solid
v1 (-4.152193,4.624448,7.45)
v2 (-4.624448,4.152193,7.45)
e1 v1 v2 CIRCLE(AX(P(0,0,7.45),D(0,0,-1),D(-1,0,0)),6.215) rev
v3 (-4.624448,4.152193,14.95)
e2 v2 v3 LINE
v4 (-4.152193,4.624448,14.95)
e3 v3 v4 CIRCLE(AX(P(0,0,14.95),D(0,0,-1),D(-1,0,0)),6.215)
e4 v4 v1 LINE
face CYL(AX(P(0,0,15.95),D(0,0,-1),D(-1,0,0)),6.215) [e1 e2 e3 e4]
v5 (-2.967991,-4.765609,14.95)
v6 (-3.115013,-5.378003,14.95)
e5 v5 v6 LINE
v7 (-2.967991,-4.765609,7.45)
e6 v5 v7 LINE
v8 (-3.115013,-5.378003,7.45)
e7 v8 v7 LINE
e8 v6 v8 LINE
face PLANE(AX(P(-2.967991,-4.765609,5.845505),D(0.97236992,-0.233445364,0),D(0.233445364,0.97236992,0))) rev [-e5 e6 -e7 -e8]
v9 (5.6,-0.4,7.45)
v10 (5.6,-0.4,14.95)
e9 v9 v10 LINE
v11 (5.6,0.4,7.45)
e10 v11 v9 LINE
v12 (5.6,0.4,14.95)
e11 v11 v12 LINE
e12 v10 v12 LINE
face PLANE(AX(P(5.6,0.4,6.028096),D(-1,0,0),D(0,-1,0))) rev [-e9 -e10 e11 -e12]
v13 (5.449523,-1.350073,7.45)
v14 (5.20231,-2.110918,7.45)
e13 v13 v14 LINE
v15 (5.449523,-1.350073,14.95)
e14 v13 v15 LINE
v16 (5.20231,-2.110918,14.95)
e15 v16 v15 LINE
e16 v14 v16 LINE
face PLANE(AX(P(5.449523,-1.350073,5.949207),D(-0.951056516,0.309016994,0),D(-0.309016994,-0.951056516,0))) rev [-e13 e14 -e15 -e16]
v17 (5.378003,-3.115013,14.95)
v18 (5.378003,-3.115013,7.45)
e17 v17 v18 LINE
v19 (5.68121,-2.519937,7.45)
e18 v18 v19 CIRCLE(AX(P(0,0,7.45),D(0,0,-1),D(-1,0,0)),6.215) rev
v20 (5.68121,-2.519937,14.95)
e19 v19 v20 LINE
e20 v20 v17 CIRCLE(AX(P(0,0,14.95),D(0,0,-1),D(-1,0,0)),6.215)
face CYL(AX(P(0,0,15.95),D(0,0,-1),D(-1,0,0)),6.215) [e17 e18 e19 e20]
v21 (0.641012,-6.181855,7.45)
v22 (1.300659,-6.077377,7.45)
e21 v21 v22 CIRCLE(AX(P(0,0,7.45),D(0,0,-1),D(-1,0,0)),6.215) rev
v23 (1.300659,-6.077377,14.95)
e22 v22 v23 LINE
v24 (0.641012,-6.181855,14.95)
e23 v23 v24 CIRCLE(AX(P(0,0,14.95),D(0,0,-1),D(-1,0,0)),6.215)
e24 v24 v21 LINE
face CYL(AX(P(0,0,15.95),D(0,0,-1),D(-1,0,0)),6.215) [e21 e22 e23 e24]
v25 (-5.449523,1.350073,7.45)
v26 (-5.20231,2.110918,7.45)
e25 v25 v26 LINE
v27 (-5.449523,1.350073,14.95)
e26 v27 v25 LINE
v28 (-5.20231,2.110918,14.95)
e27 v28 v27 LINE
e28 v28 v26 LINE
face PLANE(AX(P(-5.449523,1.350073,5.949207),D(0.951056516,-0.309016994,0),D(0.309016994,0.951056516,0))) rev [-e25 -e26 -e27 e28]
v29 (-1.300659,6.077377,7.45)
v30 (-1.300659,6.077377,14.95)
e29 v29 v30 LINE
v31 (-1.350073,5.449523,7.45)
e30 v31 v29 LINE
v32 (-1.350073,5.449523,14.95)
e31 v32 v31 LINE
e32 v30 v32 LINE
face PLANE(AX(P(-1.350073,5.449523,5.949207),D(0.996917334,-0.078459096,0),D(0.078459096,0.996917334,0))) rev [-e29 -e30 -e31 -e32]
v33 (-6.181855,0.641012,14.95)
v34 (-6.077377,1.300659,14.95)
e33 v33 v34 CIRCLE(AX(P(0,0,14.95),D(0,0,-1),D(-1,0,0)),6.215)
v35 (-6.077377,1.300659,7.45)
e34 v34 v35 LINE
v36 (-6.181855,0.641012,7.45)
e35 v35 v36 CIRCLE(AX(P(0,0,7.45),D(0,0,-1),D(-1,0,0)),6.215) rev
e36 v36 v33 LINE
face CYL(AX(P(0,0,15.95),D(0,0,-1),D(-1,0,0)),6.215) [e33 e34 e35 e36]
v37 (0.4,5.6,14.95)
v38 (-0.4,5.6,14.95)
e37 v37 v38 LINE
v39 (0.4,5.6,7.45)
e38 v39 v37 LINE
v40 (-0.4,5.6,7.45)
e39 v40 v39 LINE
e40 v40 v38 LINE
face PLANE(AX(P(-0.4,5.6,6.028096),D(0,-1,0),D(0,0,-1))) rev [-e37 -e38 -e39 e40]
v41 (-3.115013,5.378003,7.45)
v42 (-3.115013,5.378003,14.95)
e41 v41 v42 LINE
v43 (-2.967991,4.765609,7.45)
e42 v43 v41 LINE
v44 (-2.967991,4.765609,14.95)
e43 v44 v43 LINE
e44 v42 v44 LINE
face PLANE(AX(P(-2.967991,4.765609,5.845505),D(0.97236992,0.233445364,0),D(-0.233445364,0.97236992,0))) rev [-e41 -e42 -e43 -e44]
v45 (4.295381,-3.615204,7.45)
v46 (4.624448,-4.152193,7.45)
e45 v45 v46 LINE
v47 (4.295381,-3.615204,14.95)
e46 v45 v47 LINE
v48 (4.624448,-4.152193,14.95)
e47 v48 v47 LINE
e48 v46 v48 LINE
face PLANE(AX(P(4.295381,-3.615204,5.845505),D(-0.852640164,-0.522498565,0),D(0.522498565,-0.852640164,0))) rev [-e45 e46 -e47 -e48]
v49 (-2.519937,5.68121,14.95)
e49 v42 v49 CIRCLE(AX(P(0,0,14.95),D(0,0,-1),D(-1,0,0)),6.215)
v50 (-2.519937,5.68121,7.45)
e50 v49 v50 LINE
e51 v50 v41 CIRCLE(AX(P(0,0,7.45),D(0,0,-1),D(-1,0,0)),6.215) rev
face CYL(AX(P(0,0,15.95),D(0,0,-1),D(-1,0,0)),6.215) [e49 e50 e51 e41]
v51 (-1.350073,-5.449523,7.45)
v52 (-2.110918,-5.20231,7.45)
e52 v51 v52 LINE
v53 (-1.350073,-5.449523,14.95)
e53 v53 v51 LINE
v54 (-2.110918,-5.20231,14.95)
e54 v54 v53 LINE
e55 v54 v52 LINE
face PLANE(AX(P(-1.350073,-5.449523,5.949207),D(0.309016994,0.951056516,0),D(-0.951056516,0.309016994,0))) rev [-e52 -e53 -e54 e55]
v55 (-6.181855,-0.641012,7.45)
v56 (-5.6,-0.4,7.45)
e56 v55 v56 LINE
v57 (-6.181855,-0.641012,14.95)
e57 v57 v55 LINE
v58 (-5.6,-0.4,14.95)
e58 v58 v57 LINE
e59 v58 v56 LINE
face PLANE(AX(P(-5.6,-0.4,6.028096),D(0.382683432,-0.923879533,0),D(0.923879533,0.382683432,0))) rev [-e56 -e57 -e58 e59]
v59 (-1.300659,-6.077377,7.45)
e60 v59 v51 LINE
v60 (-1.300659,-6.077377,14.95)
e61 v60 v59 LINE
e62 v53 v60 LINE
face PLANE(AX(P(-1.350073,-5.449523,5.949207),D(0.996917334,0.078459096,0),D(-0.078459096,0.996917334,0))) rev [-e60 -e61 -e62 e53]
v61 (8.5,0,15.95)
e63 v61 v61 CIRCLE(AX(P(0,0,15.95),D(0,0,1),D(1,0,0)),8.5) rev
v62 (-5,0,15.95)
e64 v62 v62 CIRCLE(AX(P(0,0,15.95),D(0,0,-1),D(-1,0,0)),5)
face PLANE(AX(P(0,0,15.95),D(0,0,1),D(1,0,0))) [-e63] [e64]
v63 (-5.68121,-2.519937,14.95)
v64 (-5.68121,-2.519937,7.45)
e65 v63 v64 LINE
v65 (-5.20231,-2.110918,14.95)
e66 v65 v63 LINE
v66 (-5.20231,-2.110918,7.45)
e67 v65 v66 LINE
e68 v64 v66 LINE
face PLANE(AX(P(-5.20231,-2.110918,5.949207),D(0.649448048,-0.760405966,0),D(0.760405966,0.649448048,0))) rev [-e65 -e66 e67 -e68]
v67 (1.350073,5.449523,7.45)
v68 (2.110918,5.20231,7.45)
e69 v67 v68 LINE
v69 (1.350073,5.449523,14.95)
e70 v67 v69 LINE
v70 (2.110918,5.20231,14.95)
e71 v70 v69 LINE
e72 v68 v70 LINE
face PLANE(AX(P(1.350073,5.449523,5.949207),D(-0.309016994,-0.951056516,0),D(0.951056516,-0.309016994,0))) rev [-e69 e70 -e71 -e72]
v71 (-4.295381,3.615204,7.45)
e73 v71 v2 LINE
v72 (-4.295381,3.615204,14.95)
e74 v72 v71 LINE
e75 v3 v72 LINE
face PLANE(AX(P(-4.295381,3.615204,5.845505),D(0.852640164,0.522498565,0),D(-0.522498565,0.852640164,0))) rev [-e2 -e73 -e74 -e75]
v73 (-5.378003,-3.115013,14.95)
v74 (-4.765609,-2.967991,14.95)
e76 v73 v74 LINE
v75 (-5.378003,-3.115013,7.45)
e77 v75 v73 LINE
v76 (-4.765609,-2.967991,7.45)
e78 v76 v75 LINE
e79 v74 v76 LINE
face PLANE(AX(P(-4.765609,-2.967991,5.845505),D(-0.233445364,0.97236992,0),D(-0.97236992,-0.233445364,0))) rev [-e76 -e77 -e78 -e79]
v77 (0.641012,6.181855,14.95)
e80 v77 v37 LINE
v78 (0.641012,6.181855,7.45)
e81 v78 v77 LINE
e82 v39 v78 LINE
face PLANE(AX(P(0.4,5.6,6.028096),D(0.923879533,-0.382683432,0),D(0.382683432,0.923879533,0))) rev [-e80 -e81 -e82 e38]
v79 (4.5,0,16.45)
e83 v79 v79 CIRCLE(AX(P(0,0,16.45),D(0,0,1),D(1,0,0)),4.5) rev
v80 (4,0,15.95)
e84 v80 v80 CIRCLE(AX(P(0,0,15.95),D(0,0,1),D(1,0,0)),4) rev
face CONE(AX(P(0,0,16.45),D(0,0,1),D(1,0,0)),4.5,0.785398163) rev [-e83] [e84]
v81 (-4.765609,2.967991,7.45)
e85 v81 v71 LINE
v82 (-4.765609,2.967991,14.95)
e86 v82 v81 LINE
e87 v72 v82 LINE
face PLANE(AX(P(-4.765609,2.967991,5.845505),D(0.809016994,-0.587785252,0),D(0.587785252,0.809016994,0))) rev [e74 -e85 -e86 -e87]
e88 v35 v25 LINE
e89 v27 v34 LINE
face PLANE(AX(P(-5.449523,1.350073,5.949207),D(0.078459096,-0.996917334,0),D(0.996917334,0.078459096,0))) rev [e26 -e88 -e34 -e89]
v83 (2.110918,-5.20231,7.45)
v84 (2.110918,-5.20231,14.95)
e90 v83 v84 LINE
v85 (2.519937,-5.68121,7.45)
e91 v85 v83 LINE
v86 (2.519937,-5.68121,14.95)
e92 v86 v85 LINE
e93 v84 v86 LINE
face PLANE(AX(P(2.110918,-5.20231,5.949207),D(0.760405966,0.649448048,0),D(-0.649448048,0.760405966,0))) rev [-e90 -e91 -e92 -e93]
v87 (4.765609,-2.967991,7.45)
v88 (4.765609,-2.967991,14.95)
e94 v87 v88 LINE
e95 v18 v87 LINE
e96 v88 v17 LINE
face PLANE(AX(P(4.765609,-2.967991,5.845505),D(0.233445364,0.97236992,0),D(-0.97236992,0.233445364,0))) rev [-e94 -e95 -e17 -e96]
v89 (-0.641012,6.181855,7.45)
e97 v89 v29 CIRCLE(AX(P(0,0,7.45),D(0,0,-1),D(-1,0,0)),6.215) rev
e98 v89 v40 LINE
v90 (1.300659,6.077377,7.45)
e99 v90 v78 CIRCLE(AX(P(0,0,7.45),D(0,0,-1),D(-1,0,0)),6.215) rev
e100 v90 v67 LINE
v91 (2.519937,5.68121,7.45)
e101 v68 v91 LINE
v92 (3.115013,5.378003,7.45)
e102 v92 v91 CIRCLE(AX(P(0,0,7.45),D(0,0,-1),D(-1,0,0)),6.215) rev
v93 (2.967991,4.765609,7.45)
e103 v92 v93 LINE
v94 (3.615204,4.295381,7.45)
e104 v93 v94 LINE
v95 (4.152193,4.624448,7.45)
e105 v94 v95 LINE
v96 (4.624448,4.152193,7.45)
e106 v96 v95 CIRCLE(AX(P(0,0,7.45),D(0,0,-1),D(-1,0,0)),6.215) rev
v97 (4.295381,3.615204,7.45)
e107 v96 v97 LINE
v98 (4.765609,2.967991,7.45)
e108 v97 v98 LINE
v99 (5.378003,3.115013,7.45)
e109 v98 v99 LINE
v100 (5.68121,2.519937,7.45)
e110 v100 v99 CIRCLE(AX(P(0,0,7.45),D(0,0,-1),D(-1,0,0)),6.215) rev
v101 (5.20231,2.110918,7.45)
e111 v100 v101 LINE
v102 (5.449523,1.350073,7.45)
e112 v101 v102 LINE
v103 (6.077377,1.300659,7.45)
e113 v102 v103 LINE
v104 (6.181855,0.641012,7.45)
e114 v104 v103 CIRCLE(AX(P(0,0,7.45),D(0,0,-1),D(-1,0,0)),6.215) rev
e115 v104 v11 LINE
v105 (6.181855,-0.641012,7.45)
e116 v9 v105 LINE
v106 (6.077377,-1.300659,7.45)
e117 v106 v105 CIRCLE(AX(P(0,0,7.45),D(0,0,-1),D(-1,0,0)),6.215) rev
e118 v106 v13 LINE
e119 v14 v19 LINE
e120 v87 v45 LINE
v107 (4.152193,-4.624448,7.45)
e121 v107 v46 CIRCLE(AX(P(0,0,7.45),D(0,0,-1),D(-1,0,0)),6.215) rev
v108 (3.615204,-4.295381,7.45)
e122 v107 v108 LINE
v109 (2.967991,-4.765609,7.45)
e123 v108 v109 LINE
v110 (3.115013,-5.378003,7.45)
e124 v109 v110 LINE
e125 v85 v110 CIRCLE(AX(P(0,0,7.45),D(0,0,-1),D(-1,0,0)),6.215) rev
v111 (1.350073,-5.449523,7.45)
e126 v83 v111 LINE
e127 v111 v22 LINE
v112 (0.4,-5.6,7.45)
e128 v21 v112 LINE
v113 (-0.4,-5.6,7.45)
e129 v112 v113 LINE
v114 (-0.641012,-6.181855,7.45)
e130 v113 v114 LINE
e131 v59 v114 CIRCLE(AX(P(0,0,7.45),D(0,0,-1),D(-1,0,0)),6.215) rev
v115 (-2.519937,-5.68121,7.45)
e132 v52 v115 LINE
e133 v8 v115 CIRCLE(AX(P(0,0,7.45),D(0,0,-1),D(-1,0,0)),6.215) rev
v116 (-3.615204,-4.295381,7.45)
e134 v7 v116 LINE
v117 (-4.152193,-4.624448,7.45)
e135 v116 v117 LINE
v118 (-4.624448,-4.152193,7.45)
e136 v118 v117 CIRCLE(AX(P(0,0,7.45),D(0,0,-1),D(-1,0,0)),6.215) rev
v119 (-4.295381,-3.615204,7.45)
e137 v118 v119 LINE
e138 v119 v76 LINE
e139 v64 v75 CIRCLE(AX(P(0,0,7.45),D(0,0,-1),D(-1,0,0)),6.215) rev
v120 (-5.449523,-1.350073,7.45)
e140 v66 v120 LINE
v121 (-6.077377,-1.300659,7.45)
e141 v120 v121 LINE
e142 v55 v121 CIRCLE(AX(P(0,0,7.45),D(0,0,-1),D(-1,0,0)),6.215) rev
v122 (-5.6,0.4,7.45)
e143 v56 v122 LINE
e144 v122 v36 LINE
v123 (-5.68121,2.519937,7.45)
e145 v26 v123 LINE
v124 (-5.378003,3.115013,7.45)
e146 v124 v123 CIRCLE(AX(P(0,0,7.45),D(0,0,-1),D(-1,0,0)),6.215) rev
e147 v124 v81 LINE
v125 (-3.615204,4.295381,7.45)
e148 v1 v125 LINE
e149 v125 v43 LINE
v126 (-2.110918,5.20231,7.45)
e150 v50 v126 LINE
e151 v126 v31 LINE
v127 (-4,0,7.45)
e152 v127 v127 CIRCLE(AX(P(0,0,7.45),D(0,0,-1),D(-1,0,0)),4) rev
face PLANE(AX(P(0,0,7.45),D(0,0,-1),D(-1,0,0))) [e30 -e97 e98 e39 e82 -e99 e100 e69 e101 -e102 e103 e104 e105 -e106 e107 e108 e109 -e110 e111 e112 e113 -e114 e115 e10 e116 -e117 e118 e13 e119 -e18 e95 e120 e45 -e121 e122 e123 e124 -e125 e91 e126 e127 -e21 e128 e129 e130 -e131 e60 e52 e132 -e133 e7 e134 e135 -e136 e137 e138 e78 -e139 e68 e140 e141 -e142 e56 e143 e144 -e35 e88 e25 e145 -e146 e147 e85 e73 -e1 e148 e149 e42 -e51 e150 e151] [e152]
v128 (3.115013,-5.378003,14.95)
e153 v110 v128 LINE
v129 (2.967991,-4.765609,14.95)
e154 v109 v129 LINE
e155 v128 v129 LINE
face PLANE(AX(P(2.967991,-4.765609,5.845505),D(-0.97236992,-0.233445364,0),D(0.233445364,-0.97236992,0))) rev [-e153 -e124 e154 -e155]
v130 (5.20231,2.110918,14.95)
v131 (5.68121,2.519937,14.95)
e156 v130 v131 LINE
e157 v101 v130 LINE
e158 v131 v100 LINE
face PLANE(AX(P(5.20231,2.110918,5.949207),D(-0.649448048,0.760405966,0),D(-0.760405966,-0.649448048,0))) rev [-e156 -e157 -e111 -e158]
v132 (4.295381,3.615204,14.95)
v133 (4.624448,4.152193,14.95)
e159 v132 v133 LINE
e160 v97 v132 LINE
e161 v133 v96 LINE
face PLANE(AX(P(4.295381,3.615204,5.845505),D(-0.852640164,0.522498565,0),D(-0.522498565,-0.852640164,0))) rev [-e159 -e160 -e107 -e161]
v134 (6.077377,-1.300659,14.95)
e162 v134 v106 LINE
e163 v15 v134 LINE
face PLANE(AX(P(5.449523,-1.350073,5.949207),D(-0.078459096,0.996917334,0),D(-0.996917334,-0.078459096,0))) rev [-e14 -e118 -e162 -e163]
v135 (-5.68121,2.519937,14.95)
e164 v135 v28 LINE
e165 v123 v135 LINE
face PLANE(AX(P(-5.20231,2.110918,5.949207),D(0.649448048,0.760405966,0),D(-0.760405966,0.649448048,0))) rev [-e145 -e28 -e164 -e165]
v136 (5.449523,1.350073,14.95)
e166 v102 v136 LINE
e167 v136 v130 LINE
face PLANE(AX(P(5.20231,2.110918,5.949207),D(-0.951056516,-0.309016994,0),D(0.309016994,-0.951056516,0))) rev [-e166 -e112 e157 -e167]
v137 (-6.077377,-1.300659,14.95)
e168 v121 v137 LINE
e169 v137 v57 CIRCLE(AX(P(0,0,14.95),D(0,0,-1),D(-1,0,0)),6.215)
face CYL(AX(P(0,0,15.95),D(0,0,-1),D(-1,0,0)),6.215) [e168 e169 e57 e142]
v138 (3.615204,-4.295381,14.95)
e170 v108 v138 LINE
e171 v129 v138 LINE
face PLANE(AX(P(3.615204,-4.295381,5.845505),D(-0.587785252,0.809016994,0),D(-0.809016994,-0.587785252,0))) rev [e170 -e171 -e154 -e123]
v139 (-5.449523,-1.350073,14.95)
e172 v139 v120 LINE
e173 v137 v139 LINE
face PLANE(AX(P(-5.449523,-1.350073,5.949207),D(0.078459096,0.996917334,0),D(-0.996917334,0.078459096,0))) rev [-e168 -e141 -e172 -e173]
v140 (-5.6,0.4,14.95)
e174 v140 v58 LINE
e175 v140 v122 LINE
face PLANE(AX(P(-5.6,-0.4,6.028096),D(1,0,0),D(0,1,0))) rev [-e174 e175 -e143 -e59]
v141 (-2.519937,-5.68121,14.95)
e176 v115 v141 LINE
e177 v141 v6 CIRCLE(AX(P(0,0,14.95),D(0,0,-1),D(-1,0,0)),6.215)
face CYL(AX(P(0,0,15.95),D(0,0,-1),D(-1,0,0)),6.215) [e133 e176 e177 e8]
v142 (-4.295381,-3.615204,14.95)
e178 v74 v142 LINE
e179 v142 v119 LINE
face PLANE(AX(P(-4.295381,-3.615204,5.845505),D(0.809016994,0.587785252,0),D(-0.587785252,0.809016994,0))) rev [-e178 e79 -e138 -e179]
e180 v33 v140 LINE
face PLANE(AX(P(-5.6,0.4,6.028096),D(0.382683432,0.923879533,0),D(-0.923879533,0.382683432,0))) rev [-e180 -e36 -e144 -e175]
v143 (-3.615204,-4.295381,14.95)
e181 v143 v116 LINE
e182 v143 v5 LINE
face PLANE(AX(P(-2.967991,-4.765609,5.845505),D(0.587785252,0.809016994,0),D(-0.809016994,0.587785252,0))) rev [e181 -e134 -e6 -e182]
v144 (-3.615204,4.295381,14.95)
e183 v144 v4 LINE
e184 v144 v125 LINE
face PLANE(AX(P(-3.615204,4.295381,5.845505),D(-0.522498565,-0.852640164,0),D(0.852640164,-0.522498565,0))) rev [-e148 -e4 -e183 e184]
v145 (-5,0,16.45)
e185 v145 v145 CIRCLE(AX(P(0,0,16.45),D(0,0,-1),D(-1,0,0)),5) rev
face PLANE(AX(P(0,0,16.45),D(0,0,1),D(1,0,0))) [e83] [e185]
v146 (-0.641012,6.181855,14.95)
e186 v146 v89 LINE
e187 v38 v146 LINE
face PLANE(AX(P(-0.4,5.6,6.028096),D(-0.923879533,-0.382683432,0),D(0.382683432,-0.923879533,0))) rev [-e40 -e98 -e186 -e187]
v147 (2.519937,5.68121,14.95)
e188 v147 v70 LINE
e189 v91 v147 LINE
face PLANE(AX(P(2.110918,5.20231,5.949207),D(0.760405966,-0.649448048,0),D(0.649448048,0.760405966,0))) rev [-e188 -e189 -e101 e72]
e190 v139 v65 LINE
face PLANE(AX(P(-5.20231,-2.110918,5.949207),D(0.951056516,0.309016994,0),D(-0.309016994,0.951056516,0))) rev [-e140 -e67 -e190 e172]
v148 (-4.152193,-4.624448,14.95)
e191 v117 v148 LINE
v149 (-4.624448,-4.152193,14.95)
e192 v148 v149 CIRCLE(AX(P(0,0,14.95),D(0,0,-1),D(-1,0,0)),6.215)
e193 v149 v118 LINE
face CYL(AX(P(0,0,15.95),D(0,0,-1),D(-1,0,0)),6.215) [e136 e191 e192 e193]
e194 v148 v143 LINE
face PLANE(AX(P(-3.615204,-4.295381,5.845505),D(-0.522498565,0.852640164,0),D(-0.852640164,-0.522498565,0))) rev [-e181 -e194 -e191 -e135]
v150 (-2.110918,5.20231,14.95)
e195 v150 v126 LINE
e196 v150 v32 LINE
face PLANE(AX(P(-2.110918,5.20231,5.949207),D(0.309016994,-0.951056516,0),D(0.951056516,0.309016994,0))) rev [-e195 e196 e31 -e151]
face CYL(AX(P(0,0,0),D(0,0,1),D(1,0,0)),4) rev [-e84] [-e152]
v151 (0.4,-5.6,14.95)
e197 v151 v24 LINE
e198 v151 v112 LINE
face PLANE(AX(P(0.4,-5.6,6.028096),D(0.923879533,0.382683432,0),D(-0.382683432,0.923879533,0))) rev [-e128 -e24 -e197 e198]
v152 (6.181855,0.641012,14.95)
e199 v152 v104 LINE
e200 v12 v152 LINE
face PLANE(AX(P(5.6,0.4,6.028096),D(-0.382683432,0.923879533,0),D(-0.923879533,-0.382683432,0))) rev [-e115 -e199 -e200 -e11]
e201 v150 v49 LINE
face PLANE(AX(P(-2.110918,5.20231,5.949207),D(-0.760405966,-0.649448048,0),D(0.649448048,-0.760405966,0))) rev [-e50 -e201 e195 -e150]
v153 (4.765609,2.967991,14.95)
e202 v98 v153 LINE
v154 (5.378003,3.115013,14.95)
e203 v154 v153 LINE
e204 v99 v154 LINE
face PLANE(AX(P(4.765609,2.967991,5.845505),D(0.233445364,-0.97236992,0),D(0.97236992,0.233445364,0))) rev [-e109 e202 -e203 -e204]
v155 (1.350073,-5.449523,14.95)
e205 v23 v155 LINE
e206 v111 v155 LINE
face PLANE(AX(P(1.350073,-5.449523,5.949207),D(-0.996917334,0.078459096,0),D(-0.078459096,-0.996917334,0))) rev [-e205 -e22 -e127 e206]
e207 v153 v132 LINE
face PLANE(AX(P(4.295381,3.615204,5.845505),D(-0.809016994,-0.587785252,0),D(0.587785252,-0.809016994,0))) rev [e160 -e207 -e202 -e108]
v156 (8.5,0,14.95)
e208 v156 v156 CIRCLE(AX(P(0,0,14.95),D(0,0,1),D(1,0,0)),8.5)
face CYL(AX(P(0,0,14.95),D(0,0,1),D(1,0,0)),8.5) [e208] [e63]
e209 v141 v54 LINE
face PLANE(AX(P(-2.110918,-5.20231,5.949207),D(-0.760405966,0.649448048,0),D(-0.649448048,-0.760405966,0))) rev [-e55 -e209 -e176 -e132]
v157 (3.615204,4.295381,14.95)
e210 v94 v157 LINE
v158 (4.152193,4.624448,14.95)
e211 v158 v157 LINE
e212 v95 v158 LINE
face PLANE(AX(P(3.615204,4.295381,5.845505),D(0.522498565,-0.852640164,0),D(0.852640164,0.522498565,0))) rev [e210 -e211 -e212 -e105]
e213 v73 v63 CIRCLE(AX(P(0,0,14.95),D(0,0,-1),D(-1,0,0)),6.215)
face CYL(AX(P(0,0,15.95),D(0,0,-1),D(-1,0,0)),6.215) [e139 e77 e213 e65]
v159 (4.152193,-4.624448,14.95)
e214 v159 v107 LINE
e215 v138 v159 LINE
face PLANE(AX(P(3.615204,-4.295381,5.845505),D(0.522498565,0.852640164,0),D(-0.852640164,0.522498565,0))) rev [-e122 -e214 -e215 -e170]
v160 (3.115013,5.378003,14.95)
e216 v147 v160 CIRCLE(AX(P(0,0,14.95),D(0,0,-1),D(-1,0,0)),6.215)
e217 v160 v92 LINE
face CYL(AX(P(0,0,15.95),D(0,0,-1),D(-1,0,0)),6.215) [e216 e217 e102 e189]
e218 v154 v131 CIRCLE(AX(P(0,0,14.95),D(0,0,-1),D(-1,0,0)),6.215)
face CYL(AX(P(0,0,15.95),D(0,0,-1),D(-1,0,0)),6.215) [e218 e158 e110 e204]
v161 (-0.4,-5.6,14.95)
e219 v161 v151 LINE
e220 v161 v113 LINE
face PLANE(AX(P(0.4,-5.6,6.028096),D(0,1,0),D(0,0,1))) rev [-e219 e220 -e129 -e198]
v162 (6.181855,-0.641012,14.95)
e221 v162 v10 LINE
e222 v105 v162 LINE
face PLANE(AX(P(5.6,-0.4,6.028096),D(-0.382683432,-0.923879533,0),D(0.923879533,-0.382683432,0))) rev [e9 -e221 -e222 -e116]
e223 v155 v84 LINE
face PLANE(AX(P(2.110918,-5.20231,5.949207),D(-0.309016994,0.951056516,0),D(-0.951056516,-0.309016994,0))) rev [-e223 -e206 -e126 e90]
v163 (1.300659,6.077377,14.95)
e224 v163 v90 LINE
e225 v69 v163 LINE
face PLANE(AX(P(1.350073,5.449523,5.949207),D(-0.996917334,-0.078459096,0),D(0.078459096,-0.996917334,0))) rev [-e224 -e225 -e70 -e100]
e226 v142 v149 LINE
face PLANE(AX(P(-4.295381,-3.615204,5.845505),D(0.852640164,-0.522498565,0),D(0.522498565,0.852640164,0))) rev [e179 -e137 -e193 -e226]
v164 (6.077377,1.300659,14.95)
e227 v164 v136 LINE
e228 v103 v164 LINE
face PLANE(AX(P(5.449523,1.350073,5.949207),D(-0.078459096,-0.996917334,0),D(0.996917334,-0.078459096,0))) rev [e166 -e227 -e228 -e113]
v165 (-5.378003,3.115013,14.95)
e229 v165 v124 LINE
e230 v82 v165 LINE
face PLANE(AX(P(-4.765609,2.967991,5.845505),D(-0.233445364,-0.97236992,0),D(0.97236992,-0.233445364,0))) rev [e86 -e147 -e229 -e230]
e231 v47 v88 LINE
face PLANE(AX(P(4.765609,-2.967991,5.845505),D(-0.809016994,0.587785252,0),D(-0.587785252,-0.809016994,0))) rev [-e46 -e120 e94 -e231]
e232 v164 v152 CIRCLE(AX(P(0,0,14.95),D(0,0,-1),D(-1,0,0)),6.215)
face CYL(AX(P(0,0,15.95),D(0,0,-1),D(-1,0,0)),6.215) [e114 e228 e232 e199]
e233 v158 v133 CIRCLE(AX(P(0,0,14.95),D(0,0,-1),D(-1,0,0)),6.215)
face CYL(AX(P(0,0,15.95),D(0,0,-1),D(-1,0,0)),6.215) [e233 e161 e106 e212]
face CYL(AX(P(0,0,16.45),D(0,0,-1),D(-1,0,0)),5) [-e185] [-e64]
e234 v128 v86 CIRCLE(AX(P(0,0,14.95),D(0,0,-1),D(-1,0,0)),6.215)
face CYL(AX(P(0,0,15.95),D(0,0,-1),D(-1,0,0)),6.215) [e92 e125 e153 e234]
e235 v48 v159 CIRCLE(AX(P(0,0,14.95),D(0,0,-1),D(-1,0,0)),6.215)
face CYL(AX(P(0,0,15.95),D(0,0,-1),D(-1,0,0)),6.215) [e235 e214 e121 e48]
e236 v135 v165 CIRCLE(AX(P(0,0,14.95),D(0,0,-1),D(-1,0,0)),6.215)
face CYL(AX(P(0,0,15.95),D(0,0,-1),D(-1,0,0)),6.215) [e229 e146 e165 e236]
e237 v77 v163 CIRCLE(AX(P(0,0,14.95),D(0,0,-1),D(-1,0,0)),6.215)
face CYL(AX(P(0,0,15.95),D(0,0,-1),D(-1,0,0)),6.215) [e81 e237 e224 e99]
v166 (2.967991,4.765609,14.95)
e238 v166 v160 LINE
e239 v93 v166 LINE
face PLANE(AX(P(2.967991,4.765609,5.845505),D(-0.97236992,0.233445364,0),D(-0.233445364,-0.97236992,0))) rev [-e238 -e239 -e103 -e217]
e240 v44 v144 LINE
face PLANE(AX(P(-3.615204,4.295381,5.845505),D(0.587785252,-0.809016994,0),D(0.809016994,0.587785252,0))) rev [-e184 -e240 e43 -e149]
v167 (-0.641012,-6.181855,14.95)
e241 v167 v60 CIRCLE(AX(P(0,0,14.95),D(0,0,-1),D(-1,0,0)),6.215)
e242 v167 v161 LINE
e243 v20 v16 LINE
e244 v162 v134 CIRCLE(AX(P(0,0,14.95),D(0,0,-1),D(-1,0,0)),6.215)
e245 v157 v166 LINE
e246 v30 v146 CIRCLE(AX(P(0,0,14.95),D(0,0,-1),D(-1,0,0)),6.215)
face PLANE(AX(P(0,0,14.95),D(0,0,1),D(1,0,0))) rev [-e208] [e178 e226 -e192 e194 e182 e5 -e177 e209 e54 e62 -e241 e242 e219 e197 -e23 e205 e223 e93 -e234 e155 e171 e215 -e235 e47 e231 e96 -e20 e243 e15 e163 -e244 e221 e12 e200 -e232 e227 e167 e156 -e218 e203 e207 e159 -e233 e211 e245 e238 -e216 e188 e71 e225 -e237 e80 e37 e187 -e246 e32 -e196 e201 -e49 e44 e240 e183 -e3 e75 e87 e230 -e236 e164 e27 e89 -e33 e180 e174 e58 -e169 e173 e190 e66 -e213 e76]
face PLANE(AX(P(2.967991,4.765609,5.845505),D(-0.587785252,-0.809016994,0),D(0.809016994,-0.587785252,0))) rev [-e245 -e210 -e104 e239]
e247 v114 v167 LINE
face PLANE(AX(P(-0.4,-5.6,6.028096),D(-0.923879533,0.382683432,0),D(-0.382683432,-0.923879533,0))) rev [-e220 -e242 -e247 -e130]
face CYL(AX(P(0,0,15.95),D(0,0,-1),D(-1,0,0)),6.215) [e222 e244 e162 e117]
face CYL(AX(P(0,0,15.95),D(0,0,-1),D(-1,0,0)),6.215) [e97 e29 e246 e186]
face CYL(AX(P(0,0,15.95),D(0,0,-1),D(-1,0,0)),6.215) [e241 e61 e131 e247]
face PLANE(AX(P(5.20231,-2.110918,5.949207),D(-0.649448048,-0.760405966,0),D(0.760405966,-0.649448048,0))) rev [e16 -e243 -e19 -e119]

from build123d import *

# Parameters (mm, degrees)
CUT_EXTRUDE1_DEPTH       = 3
CHAMFER1_SIZE            = 0.259911356
CHAMFER1_SIZE2           = 0.226339217
CUT_EXTRUDE2_START       = 1
CUT_EXTRUDE2_2_OUTLINE_W = 16
CUT_EXTRUDE2_2_OUTLINE_H = 4
CUT_EXTRUDE2_2_DEPTH     = 6.45
CUT_EXTRUDE2_START_2     = 7.45
CUT_EXTRUDE2_3_OUTLINE_R = 5
CUT_EXTRUDE2_3_DEPTH     = 7.5


with BuildPart() as part:
    # Sketch1 → Revolve1 (revolve)
    with BuildSketch(Plane.XY.offset(3.725), mode=Mode.PRIVATE) as revolve1_sk:
        Polygon((1.614337285, 9), (0, 9), (0, 5), (0.595828025, 5), (1.614337285, 5.592863599), align=None)
    revolve(revolve1_sk.sketch.rotate(Axis((0, 9, 3.725), (0, -1, 0)), 270), axis=Axis((0, 9, 3.725), (0, -1, 0)))

    # Sketch2 → Cut-Extrude1 (cut)
    with BuildSketch(Plane(origin=(0, 9, 0), x_dir=(-1, 0, 0), z_dir=(0, 1, 0))):
        Polygon((0.877701457, 2.974684409), (1.088643091, 4.109953963), (0.210941634, 4.860269554), (-0.877701457, 4.475315591), (-1.088643091, 3.340046037), (-0.210941634, 2.589730446), align=None)
    extrude(amount=-CUT_EXTRUDE1_DEPTH, mode=Mode.SUBTRACT)

    # Chamfer1
    chamfer1_edges = [part.edges().sort_by_distance(p)[0] for p in [
        (0, 9, 5.339337285),
    ]]
    chamfer1_side = [part.faces().sort_by_distance(p)[0] for p in [
        (0, 9, 5.293676931),
    ]]
    chamfer(chamfer1_edges, length=CHAMFER1_SIZE, length2=CHAMFER1_SIZE2, reference=chamfer1_side[0])

    # Cut-Extrude2 2 outline → Cut-Extrude2 2 (cut)
    with BuildSketch(Plane.XY.offset(CUT_EXTRUDE2_START)):
        with Locations((0, 7)):
            Rectangle(CUT_EXTRUDE2_2_OUTLINE_W, CUT_EXTRUDE2_2_OUTLINE_H)
    extrude(amount=CUT_EXTRUDE2_2_DEPTH, mode=Mode.SUBTRACT)


with BuildPart() as body_2:
    # Cut-Extrude2: read off the stored shape, not the designer's step
    # Cut-Extrude2 outline → Cut-Extrude2 (revolve)
    with BuildSketch(Plane.XZ):
        Polygon((4, 7.45), (5, 7.45), (5, 14.95), (8.5, 14.95), (8.5, 15.95), (5, 15.95), (5, 16.45), (4.5, 16.45), (4, 15.95), align=None)
    revolve(axis=Axis((0, 0, 0), (0, 0, 1)))

    # Cut-Extrude2 3 outline → Cut-Extrude2 3 (add)
    with BuildSketch(Plane.XY.offset(CUT_EXTRUDE2_START_2)):
        with BuildLine():
            Line((1.30065941, -6.077376909), (1.350072562, -5.449523289))
            Line((1.350072562, -5.449523289), (2.110917775, -5.202309694))
            Line((2.110917775, -5.202309694), (2.519936953, -5.681209621))
            ThreePointArc((2.519936953, -5.681209621), (2.821550956, -5.537605548), (3.115013354, -5.37800305))
            Line((3.115013354, -5.37800305), (2.967990615, -4.765609269))
            Line((2.967990615, -4.765609269), (3.615204211, -4.295381068))
            Line((3.615204211, -4.295381068), (4.152192781, -4.624448087))
            ThreePointArc((4.152192781, -4.624448087), (4.394668645, -4.394668645), (4.624448087, -4.152192781))
            Line((4.624448087, -4.152192781), (4.295381068, -3.615204211))
            Line((4.295381068, -3.615204211), (4.765609269, -2.967990615))
            Line((4.765609269, -2.967990615), (5.37800305, -3.115013354))
            ThreePointArc((5.37800305, -3.115013354), (5.537605548, -2.821550956), (5.681209621, -2.519936953))
            Line((5.681209621, -2.519936953), (5.202309694, -2.110917775))
            Line((5.202309694, -2.110917775), (5.449523289, -1.350072562))
            Line((5.449523289, -1.350072562), (6.077376909, -1.30065941))
            ThreePointArc((6.077376909, -1.30065941), (6.138483037, -0.9722402), (6.181854773, -0.641012138))
            Line((6.181854773, -0.641012138), (5.6, -0.4))
            Line((5.6, -0.4), (5.6, 0.4))
            Line((5.6, 0.4), (6.181854773, 0.641012138))
            ThreePointArc((6.181854773, 0.641012138), (6.138483037, 0.9722402), (6.077376909, 1.30065941))
            Line((6.077376909, 1.30065941), (5.449523289, 1.350072562))
            Line((5.449523289, 1.350072562), (5.202309694, 2.110917775))
            Line((5.202309694, 2.110917775), (5.681209621, 2.519936953))
            ThreePointArc((5.681209621, 2.519936953), (5.537605548, 2.821550956), (5.37800305, 3.115013354))
            Line((5.37800305, 3.115013354), (4.765609269, 2.967990615))
            Line((4.765609269, 2.967990615), (4.295381068, 3.615204211))
            Line((4.295381068, 3.615204211), (4.624448087, 4.152192781))
            ThreePointArc((4.624448087, 4.152192781), (4.394668645, 4.394668645), (4.152192781, 4.624448087))
            Line((4.152192781, 4.624448087), (3.615204211, 4.295381068))
            Line((3.615204211, 4.295381068), (2.967990615, 4.765609269))
            Line((2.967990615, 4.765609269), (3.115013354, 5.37800305))
            ThreePointArc((3.115013354, 5.37800305), (2.821550956, 5.537605548), (2.519936953, 5.681209621))
            Line((2.519936953, 5.681209621), (2.110917775, 5.202309694))
            Line((2.110917775, 5.202309694), (1.350072562, 5.449523289))
            Line((1.350072562, 5.449523289), (1.30065941, 6.077376909))
            ThreePointArc((1.30065941, 6.077376909), (0.9722402, 6.138483037), (0.641012138, 6.181854773))
            Line((0.641012138, 6.181854773), (0.4, 5.6))
            Line((0.4, 5.6), (-0.4, 5.6))
            Line((-0.4, 5.6), (-0.641012138, 6.181854773))
            ThreePointArc((-0.641012138, 6.181854773), (-0.9722402, 6.138483037), (-1.30065941, 6.077376909))
            Line((-1.30065941, 6.077376909), (-1.350072562, 5.449523289))
            Line((-1.350072562, 5.449523289), (-2.110917775, 5.202309694))
            Line((-2.110917775, 5.202309694), (-2.519936953, 5.681209621))
            ThreePointArc((-2.519936953, 5.681209621), (-2.821550956, 5.537605548), (-3.115013354, 5.37800305))
            Line((-3.115013354, 5.37800305), (-2.967990615, 4.765609269))
            Line((-2.967990615, 4.765609269), (-3.615204211, 4.295381068))
            Line((-3.615204211, 4.295381068), (-4.152192781, 4.624448087))
            ThreePointArc((-4.152192781, 4.624448087), (-4.394668645, 4.394668645), (-4.624448087, 4.152192781))
            Line((-4.624448087, 4.152192781), (-4.295381068, 3.615204211))
            Line((-4.295381068, 3.615204211), (-4.765609269, 2.967990615))
            Line((-4.765609269, 2.967990615), (-5.37800305, 3.115013354))
            ThreePointArc((-5.37800305, 3.115013354), (-5.537605548, 2.821550956), (-5.681209621, 2.519936953))
            Line((-5.681209621, 2.519936953), (-5.202309694, 2.110917775))
            Line((-5.202309694, 2.110917775), (-5.449523289, 1.350072562))
            Line((-5.449523289, 1.350072562), (-6.077376909, 1.30065941))
            ThreePointArc((-6.077376909, 1.30065941), (-6.138483037, 0.9722402), (-6.181854773, 0.641012138))
            Line((-6.181854773, 0.641012138), (-5.6, 0.4))
            Line((-5.6, 0.4), (-5.6, -0.4))
            Line((-5.6, -0.4), (-6.181854773, -0.641012138))
            ThreePointArc((-6.181854773, -0.641012138), (-6.138483037, -0.9722402), (-6.077376909, -1.30065941))
            Line((-6.077376909, -1.30065941), (-5.449523289, -1.350072562))
            Line((-5.449523289, -1.350072562), (-5.202309694, -2.110917775))
            Line((-5.202309694, -2.110917775), (-5.681209621, -2.519936953))
            ThreePointArc((-5.681209621, -2.519936953), (-5.537605548, -2.821550956), (-5.37800305, -3.115013354))
            Line((-5.37800305, -3.115013354), (-4.765609269, -2.967990615))
            Line((-4.765609269, -2.967990615), (-4.295381068, -3.615204211))
            Line((-4.295381068, -3.615204211), (-4.624448087, -4.152192781))
            ThreePointArc((-4.624448087, -4.152192781), (-4.394668645, -4.394668645), (-4.152192781, -4.624448087))
            Line((-4.152192781, -4.624448087), (-3.615204211, -4.295381068))
            Line((-3.615204211, -4.295381068), (-2.967990615, -4.765609269))
            Line((-2.967990615, -4.765609269), (-3.115013354, -5.37800305))
            ThreePointArc((-3.115013354, -5.37800305), (-2.821550956, -5.537605548), (-2.519936953, -5.681209621))
            Line((-2.519936953, -5.681209621), (-2.110917775, -5.202309694))
            Line((-2.110917775, -5.202309694), (-1.350072562, -5.449523289))
            Line((-1.350072562, -5.449523289), (-1.30065941, -6.077376909))
            ThreePointArc((-1.30065941, -6.077376909), (-0.9722402, -6.138483037), (-0.641012138, -6.181854773))
            Line((-0.641012138, -6.181854773), (-0.4, -5.6))
            Line((-0.4, -5.6), (0.4, -5.6))
            Line((0.4, -5.6), (0.641012138, -6.181854773))
            ThreePointArc((0.641012138, -6.181854773), (0.9722402, -6.138483037), (1.30065941, -6.077376909))
        make_face()
        Circle(CUT_EXTRUDE2_3_OUTLINE_R, mode=Mode.SUBTRACT)
    extrude(amount=CUT_EXTRUDE2_3_DEPTH)


solid = body_2.part
